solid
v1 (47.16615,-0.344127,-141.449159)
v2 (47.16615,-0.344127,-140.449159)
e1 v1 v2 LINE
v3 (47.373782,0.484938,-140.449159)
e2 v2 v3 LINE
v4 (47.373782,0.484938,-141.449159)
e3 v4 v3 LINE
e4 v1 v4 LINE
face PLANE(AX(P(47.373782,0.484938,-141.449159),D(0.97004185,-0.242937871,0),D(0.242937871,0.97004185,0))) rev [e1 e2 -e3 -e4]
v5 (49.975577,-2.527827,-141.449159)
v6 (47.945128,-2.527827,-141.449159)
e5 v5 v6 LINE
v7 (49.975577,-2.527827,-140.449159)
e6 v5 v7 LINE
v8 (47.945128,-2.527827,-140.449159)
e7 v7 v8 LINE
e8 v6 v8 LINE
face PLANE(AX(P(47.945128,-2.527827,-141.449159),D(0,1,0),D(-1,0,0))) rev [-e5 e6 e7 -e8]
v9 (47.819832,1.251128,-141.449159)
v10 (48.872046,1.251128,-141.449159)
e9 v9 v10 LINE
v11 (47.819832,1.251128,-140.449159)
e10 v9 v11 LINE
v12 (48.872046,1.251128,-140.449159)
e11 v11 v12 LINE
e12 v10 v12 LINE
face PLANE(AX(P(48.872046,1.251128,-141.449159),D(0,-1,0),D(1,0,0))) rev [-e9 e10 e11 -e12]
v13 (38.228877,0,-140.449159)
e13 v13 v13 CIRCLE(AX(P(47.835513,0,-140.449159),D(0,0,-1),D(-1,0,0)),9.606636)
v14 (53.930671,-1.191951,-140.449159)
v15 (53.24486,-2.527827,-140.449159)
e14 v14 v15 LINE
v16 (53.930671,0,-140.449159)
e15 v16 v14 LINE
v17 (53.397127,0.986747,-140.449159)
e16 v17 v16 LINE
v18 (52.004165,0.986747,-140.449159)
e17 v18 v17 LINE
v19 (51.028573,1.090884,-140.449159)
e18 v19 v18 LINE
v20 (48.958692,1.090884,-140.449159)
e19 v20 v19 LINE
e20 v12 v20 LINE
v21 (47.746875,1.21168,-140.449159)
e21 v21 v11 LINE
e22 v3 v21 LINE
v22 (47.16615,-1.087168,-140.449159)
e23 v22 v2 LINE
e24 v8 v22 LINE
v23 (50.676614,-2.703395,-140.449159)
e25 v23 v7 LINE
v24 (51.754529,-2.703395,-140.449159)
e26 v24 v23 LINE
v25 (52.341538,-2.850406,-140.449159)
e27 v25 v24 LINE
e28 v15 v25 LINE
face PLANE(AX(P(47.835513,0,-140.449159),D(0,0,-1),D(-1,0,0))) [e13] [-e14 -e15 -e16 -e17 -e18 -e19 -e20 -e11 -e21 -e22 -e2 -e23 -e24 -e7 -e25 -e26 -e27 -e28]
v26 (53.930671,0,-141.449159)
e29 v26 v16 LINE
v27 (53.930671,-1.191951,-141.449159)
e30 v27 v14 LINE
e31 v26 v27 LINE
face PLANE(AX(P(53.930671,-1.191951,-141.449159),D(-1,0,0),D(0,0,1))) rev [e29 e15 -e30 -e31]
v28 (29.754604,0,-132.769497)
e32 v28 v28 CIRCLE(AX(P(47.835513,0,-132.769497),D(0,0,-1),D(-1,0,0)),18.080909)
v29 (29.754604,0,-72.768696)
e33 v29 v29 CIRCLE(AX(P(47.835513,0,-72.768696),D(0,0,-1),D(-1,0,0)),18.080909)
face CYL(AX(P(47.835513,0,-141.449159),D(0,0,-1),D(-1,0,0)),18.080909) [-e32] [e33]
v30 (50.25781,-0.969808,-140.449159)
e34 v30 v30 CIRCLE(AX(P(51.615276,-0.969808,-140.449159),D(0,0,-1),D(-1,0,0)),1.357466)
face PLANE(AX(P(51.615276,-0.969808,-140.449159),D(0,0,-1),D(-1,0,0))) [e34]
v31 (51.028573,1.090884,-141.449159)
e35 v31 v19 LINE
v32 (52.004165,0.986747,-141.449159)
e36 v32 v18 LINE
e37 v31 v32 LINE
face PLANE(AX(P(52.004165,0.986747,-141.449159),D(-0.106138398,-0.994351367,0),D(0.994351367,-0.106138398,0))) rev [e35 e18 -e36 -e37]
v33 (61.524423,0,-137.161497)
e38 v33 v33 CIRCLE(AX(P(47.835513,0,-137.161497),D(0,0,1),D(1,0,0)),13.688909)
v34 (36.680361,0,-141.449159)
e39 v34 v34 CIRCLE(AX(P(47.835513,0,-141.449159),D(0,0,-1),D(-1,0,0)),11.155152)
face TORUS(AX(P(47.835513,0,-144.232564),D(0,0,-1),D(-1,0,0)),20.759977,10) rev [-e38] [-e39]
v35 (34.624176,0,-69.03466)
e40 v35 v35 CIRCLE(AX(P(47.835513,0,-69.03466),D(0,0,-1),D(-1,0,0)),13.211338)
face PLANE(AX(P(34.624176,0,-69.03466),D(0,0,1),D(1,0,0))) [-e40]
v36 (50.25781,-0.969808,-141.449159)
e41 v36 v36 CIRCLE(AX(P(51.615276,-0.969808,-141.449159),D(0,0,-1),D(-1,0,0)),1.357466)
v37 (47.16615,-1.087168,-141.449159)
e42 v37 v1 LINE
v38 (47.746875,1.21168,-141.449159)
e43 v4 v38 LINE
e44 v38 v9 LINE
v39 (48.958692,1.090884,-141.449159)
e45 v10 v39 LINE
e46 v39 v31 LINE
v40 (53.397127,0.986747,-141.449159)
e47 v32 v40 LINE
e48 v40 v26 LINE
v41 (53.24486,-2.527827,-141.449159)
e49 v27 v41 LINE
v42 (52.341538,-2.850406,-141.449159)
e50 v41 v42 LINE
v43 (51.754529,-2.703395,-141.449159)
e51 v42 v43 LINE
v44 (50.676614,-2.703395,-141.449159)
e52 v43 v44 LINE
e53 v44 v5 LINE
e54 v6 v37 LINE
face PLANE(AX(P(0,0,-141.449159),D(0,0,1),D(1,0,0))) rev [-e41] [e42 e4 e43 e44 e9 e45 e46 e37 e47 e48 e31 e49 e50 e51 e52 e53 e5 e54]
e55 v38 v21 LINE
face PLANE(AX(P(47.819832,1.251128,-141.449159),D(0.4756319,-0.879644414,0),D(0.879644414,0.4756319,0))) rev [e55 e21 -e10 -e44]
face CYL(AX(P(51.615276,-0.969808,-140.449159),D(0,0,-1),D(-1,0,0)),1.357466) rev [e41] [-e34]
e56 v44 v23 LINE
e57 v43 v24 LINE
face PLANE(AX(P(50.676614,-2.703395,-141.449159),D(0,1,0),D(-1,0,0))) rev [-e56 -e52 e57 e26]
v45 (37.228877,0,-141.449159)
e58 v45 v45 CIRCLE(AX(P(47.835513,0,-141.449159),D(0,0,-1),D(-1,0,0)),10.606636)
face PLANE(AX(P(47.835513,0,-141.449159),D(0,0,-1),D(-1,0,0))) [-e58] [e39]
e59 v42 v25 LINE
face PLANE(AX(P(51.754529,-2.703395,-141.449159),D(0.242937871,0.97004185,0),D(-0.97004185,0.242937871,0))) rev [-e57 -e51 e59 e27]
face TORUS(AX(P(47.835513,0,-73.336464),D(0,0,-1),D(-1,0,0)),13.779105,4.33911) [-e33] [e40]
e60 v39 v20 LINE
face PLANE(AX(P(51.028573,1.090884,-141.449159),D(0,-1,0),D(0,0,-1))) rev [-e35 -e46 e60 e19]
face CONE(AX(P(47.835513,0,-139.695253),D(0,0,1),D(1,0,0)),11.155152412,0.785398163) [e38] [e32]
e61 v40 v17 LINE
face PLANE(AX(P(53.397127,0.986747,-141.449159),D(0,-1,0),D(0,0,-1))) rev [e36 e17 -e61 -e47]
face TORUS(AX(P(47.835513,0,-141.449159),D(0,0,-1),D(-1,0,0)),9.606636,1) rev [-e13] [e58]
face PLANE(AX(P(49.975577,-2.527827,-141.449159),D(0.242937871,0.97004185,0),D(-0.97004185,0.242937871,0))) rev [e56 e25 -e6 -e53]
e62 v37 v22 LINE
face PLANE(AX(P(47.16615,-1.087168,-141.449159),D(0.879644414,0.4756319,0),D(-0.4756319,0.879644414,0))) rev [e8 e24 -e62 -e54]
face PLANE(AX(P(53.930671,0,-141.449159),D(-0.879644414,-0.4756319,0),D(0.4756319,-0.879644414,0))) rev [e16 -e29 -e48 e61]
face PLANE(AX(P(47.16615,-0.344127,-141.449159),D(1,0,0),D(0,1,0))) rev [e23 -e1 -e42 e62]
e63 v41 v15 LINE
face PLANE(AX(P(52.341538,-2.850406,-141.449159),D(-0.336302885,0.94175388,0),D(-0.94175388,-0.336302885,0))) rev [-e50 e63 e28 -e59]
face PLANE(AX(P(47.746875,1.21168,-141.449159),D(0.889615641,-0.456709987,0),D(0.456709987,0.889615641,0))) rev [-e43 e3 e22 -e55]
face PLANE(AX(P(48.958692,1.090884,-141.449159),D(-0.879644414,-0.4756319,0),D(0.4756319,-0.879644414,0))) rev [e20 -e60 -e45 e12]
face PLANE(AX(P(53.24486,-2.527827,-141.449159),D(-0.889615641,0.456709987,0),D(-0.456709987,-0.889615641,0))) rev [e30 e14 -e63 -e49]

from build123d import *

# Parameters (mm, degrees)
FILLET1_R           = 10
SKETCH3_R           = 10.606635926
CUT_EXTRUDE1_DEPTH  = 1
FILLET2_R           = 1
BOSS_EXTRUDE1_DEPTH = 1
SKETCH5_R           = 1.357466481
CUT_EXTRUDE2_DEPTH  = 1


# Some blends are built 0.0001 mm under size
with BuildPart() as part:
    # Sketch2 → Revolve1 (revolve)
    with BuildSketch(Plane(origin=(0, 0, 0), x_dir=(1, 0, 0), z_dir=(0, 1, 0))):
        with BuildLine():
            Line((47.835513338, 141.44915936), (36.680360926, 141.44915936))
            Line((36.680360926, 141.44915936), (36.680360926, 139.695253367))
            Line((36.680360926, 139.695253367), (29.754604349, 132.769496791))
            Line((29.754604349, 132.769496791), (29.754604349, 72.768696414))
            ThreePointArc((29.754604349, 72.768696414), (31.416045745, 69.893157133), (34.624175548, 69.034660285))
            Line((34.624175548, 69.034660285), (47.835513338, 69.034660285))
            Line((47.835513338, 69.034660285), (47.835513338, 141.44915936))
        make_face()
    revolve(axis=Axis((47.835513338, 0, -141.44915936), (0, 0, 1)))

    # Fillet1
    # the kernel refuses this fillet: 10 mm, written as the material it adds along each edge
    with BuildSketch(Plane(origin=(47.835513338, 0, -139.695253367), x_dir=(-1, 0, 0), z_dir=(0, 1, 0))) as fillet1_piece_1:
        with BuildLine():
            CenterArc((20.759977074, -4.537310962), FILLET1_R, 135, 28.838814676)
            Line((13.688909262, 2.533756849), (13.547487906, 2.675178206))
            Line((13.547487906, 2.675178206), (11.013731056, 0.141421356))
            Line((11.013731056, 0.141421356), (10.955152412, 0))
            ThreePointArc((10.955152412, 0), (10.955152412, -0.876952996), (10.963055919, -1.698237893))
            Line((10.963055919, -1.698237893), (11.155152412, -1.753905993))
        make_face()
    revolve(axis=Axis((47.835513338, 0, -139.695253367), (0, 0, 1)))

    # Sketch3 → Cut-Extrude1 (cut)
    with BuildSketch(Plane(origin=(0, 0, -141.44915936), x_dir=(-1, 0, 0), z_dir=(0, 0, -1))):
        with Locations((-47.835513338, 0)):
            Circle(SKETCH3_R)
    extrude(amount=-CUT_EXTRUDE1_DEPTH, mode=Mode.SUBTRACT)

    # Fillet2
    fillet2_edges = [part.edges().sort_by_distance(p)[0] for p in [
        (58.442149264, 0, -140.44915936),
    ]]
    fillet(fillet2_edges, radius=FILLET2_R - 0.0001)  # a hair under: the kernel refuses the full size

    # Sketch4 → Boss-Extrude1 (add)
    with BuildSketch(Plane(origin=(0, 0, -140.44915936), x_dir=(-1, 0, 0), z_dir=(0, 0, -1))):
        Polygon((-53.244860259, -2.527826931), (-53.930670857, -1.191951097), (-53.930670857, 0), (-53.39712733, 0.986747489), (-52.726937837, 0.986747489), (-52.00416544, 0.986747489), (-51.028572962, 1.090883539), (-49.975577249, 1.090883539), (-48.95869179, 1.090883539), (-48.872046113, 1.251128017), (-47.819832156, 1.251128017), (-47.746875393, 1.211679618), (-47.373781513, 0.484938009), (-47.166149857, -0.344127446), (-47.166149857, -1.087168011), (-47.560328453, -1.81617084), (-47.945127508, -2.527826931), (-48.375815512, -2.527826931), (-49.1103871, -2.527826931), (-49.975577249, -2.527826931), (-50.676613698, -2.703394925), (-51.754528733, -2.703394925), (-52.341537829, -2.85040584), align=None)
    extrude(amount=BOSS_EXTRUDE1_DEPTH)

    # Sketch5 → Cut-Extrude2 (cut)
    with BuildSketch(Plane(origin=(0, 0, -141.44915936), x_dir=(-1, 0, 0), z_dir=(0, 0, -1))):
        with Locations((-51.615276347, -0.969807614)):
            Circle(SKETCH5_R)
    extrude(amount=-CUT_EXTRUDE2_DEPTH, mode=Mode.SUBTRACT)


solid = part.part
